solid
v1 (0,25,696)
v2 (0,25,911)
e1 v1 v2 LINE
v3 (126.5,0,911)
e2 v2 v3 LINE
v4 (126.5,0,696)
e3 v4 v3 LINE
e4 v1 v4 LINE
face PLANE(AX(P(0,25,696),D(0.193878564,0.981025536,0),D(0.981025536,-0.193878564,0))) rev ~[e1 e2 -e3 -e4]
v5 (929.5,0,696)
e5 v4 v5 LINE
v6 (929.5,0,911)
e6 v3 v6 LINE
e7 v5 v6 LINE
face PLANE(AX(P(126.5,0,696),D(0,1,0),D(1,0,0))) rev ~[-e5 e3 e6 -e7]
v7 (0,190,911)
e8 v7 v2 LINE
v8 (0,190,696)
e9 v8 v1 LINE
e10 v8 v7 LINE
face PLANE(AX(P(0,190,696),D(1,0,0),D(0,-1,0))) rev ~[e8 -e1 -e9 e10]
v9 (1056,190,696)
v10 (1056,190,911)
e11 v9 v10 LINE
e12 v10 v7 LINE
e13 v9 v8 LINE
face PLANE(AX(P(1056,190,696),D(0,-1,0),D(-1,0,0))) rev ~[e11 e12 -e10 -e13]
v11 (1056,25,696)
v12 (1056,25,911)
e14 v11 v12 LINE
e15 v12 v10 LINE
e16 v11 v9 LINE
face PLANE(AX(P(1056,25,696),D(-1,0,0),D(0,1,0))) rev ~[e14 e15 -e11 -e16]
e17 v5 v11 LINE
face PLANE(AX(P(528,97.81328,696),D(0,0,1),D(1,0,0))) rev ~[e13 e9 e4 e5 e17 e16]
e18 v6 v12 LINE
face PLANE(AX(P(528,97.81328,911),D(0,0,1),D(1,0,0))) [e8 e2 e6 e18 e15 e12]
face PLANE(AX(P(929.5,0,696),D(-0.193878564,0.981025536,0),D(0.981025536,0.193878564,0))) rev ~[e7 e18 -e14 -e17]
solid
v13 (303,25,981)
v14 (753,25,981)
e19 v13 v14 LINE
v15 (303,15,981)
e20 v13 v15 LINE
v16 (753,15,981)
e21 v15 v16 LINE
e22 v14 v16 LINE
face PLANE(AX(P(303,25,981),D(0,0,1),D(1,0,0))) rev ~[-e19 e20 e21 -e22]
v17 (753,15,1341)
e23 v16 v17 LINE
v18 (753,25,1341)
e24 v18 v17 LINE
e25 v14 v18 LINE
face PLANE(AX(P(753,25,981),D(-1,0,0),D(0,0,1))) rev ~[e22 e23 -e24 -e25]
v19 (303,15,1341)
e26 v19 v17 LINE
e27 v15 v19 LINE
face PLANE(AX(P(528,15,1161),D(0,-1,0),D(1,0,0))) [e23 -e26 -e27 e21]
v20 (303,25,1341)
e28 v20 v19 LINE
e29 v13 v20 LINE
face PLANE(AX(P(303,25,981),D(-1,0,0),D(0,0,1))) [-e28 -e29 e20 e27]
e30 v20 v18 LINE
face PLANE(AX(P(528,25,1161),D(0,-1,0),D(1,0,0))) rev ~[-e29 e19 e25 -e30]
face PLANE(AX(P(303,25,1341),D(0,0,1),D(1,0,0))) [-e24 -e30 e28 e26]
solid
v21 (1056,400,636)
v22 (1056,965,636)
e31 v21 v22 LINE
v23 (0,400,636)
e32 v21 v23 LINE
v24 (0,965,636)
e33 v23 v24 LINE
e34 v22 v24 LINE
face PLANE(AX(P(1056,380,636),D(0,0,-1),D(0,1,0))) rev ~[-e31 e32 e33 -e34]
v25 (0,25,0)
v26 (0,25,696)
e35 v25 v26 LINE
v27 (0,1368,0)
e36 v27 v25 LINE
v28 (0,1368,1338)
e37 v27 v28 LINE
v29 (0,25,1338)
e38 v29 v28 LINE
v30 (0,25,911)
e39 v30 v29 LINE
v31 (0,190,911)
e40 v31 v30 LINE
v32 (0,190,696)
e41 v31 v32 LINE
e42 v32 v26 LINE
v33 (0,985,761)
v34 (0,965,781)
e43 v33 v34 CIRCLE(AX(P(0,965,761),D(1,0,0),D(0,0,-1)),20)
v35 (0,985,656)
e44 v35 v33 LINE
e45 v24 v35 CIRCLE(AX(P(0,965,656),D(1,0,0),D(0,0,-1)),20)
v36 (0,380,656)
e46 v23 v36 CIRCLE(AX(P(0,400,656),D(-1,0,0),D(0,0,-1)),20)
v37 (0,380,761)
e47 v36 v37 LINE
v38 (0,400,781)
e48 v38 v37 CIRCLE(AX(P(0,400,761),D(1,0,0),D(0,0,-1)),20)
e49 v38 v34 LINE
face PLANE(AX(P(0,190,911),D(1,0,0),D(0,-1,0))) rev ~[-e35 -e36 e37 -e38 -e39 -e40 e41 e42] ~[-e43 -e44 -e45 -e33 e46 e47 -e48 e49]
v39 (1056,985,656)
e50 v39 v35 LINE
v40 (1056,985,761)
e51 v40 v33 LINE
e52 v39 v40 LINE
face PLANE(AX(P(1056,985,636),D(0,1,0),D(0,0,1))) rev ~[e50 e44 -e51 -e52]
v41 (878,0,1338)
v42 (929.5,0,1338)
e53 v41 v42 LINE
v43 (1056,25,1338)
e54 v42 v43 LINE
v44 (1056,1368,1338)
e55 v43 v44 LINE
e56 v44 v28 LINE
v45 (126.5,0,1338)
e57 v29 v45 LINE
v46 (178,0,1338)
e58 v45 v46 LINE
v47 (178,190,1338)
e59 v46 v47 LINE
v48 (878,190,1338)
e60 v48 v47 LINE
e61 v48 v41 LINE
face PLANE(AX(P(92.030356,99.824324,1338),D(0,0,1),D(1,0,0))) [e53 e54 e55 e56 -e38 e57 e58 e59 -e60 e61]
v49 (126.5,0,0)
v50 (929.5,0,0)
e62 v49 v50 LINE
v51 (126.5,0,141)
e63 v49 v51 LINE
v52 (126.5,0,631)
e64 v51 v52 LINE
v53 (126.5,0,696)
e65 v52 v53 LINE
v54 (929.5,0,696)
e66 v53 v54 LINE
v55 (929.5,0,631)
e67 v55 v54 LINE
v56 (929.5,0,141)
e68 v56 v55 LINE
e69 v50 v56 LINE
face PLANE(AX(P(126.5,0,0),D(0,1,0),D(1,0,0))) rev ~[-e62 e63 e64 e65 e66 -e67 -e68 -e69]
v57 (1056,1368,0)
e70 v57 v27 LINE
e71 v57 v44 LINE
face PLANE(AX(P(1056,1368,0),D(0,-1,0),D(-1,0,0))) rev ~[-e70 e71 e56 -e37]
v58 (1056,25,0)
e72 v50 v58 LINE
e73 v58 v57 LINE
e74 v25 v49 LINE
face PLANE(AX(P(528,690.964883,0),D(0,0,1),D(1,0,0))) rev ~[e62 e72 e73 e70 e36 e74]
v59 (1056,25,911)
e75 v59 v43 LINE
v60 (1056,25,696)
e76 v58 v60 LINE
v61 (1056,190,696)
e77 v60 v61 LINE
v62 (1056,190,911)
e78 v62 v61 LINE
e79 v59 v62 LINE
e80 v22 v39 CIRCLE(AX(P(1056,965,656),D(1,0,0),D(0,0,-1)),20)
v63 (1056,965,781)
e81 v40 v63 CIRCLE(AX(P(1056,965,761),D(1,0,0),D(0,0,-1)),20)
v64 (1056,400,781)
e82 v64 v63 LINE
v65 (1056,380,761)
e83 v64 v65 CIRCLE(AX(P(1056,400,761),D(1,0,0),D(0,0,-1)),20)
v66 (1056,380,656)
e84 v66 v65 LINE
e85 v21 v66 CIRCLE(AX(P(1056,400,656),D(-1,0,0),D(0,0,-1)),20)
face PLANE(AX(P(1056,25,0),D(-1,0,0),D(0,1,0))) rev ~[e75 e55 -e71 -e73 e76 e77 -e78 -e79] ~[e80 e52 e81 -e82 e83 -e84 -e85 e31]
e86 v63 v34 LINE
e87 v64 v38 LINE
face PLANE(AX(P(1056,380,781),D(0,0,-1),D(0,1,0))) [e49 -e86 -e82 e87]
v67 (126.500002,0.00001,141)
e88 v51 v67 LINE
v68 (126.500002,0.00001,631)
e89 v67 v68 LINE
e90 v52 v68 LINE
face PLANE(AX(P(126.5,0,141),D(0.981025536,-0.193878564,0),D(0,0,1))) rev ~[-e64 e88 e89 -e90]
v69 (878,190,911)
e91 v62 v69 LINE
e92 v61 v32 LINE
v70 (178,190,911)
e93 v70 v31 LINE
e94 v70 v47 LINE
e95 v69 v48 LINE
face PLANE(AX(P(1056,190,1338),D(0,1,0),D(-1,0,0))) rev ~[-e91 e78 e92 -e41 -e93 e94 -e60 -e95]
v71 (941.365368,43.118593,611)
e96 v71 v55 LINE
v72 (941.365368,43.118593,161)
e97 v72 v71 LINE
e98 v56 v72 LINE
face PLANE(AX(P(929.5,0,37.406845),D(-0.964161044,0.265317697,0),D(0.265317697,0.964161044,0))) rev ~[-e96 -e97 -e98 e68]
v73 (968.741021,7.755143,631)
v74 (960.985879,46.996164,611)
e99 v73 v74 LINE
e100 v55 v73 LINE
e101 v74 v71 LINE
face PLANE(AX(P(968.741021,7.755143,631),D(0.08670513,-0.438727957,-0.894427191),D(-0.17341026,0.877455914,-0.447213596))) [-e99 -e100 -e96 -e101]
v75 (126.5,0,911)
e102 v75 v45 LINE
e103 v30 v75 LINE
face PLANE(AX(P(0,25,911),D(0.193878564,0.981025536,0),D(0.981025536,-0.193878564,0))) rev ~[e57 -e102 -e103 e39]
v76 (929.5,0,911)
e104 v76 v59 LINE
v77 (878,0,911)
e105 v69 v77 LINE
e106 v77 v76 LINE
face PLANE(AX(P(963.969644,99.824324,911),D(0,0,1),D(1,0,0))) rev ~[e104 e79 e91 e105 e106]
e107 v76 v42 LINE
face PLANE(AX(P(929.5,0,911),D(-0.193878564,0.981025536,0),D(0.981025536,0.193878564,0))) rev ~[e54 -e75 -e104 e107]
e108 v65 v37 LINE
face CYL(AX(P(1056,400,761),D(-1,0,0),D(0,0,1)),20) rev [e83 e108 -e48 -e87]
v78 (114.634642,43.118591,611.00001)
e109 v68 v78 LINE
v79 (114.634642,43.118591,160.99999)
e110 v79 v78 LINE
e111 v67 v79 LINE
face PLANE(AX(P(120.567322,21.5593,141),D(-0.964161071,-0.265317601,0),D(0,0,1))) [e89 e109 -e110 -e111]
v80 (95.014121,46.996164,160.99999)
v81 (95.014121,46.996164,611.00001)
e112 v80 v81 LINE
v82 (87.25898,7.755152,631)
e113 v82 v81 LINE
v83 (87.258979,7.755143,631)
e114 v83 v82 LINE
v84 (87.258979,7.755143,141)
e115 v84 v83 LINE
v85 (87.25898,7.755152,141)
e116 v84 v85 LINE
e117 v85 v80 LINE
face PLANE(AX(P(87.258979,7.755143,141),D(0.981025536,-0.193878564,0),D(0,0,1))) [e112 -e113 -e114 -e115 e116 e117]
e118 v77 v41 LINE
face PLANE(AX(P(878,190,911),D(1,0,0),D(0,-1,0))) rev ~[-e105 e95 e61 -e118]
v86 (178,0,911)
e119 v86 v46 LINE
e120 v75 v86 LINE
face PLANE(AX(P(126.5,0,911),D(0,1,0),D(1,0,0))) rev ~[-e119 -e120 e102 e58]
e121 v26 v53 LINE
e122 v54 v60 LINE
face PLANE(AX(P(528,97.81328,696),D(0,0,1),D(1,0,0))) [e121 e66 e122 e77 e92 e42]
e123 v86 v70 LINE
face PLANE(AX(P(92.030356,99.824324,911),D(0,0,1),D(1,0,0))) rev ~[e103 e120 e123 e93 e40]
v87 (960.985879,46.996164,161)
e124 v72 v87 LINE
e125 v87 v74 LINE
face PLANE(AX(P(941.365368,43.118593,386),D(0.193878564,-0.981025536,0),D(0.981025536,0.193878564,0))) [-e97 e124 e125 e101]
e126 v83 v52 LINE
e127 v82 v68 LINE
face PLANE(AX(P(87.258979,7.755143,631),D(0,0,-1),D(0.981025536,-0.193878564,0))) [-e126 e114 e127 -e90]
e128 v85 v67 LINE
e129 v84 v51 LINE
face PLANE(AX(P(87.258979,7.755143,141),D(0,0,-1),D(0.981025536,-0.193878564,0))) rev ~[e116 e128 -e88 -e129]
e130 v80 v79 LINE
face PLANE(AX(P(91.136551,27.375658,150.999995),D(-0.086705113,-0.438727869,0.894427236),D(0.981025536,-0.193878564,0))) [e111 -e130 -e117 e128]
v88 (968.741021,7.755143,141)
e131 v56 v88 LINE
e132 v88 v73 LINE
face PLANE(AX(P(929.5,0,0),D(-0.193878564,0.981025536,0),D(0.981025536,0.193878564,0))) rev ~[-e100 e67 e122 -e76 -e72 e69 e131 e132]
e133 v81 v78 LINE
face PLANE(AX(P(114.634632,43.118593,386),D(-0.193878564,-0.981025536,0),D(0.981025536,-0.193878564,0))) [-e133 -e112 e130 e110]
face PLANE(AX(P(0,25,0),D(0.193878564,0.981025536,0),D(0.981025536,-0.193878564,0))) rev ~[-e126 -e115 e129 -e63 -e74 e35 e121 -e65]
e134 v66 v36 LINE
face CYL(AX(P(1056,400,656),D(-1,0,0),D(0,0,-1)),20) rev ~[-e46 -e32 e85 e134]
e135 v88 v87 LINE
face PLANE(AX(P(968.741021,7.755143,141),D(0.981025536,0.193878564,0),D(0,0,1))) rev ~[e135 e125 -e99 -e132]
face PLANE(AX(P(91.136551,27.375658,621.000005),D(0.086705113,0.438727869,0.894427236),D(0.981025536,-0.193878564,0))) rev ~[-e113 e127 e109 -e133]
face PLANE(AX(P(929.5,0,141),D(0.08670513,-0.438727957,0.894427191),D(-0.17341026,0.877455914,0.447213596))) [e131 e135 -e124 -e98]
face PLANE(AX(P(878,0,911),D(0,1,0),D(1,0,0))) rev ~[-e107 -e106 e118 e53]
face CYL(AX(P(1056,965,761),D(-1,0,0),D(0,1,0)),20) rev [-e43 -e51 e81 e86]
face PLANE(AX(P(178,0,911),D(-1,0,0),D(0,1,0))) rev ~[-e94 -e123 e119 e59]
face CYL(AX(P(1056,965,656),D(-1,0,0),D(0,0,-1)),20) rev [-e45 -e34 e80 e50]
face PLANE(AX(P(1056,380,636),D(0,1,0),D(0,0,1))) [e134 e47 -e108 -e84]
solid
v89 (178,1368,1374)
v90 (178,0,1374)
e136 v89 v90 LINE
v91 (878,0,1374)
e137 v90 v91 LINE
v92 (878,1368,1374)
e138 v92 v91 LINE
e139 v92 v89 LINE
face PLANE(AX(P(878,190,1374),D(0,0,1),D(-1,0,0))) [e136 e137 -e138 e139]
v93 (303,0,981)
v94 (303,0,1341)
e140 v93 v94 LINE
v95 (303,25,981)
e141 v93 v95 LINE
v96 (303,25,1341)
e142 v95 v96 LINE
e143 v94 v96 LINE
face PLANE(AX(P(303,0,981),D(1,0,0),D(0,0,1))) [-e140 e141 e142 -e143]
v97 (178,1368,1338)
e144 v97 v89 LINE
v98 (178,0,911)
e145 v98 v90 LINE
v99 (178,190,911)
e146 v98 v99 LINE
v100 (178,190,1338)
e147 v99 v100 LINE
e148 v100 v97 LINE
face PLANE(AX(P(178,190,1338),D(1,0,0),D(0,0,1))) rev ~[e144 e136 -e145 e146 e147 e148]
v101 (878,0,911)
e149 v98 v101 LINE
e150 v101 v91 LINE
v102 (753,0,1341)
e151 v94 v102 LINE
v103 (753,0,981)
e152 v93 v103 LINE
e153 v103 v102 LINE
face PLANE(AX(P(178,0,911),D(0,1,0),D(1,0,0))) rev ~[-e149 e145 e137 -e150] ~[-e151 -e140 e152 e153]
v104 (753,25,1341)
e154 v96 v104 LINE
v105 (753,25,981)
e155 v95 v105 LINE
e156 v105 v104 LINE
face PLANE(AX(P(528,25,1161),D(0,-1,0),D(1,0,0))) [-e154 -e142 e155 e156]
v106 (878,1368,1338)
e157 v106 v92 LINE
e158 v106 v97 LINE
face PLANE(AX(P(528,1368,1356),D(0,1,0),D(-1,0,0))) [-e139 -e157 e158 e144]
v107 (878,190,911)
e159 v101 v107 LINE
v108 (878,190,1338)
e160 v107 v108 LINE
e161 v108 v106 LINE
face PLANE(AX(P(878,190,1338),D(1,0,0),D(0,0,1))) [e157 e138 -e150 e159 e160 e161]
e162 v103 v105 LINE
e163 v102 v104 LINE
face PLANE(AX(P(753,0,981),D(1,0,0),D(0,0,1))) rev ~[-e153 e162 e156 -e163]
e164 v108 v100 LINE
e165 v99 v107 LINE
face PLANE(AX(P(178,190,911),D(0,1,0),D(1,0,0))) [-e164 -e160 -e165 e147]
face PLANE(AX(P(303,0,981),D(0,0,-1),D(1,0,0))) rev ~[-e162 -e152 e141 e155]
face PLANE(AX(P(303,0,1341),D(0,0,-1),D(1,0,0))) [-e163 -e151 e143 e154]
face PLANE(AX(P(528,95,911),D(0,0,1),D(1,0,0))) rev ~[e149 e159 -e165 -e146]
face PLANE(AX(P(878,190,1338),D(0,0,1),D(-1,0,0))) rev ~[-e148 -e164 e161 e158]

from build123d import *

# Parameters (mm, degrees)
F1_DEPTH     = 1338
F3_DEPTH     = 642
F4_DEPTH     = 215
F5_W         = 700
F5_H         = 190
F6_DEPTH     = 463
F8_DEPTH     = 427
F9_W         = 700
F9_H         = 36
F10_DEPTH    = 1178
F11_W        = 605
F11_H        = 145
F12_DEPTH    = 1056.001
F13_R        = 20
F14_W        = 450
F14_H        = 360
F15_DEPTH    = 25
F16_DEPTH    = 10
F17_W        = 40
F17_H        = 490
F18_DEPTH    = 40
F19_SIZE2    = 19.99999
F19_SIZE     = 39.99999
F20_W        = 40
F20_H        = 490
F21_DEPTH    = 40
F22_T1_DEPTH = 593.5931549515
F22_T3_DEPTH = 40
F22_T5_DEPTH = 40


# Not quite as in the source:
# - a fillet or chamfer that OpenCascade refuses, or shapes differently, is made with other operations: its cross-section is extruded or revolved along the edge and cut away or added
# - a fillet or chamfer is up to 0.001 mm smaller than in the source, because OpenCascade refuses the exact size


with BuildPart() as f1:
    # F0 (on Top) → F1 (new body)
    with BuildSketch(Plane.XY):
        Polygon((1056, 1368), (0, 1368), (0, 25), (126.5, 0), (929.5, 0), (1056, 25), align=None)
    extrude(amount=F1_DEPTH)

    # F2 (on face) → F3 (cut)
    with BuildSketch(Plane.XY.offset(1338)):
        Polygon((1056, 190), (0, 190), (0, 25), (126.5, 0), (929.5, 0), (1056, 25), align=None)
    extrude(amount=-F3_DEPTH, mode=Mode.SUBTRACT)


with BuildPart() as f4:
    # F4 (new): a face of the model
    f4_faces = [f1.part.faces().sort_by_distance(p)[0] for p in [
        (528, 96.3879218308, 696),
    ]]
    extrude(f4_faces, amount=F4_DEPTH)


with BuildPart() as f6:
    # F5 (on face) → F6 (new body)
    with BuildSketch(Plane.XY.offset(911)):
        with Locations((528, 95)):
            Rectangle(F5_W, F5_H)
    extrude(amount=F6_DEPTH)

    # F9 (on face) → F10 (join, through all)
    with BuildSketch(Plane(origin=(0, 190, 0), x_dir=(-1, 0, 0), z_dir=(0, 1, 0))):
        with Locations((-528, 1356)):
            Rectangle(F9_W, F9_H)
    extrude(amount=F10_DEPTH)

    # F14 (on face) → F15 (cut)
    with BuildSketch(Plane.XZ):
        with Locations((528, 1161)):
            Rectangle(F14_W, F14_H)
    extrude(amount=-F15_DEPTH, mode=Mode.SUBTRACT)


with BuildPart() as f1_1:
    add(f1.part)

    # F7 (on face) → F8 (join, through all)
    with BuildSketch(Plane.XY.offset(911)):
        Polygon((0, 25), (126.5, 0), (178, 0), (178, 190), (0, 190), align=None)
        Polygon((878, 190), (878, 0), (929.5, 0), (1056, 25), (1056, 190), align=None)
    extrude(amount=F8_DEPTH)

    # F11 (on face) → F12 (cut, through all)
    with BuildSketch(Plane.YZ.offset(1056)):
        with Locations((682.5, 708.5)):
            Rectangle(F11_W, F11_H)
    extrude(amount=-F12_DEPTH, mode=Mode.SUBTRACT)

    # F13
    f13_edges = [f1_1.edges().sort_by_distance(p)[0] for p in [
        (528, 380, 781),
        (528, 985, 781),
        (528, 380, 636),
        (528, 985, 636),
    ]]
    fillet(f13_edges, radius=F13_R)

    # F17 (on face) → F18 (cut)
    with BuildSketch(Plane(origin=(4.7549955645, 24.0602775564, 0), x_dir=(0.981025536, -0.1938785644, 0), z_dir=(-0.1938785644, -0.981025536, 0))):
        with Locations((104.0997303022, 386)):
            Rectangle(F17_W, F17_H)
    extrude(amount=-F18_DEPTH, mode=Mode.SUBTRACT)

    # F19 (size 40 and 20 in the source; OpenCascade refuses exactly that, so slightly less here)
    f19_edges = [f1_1.edges().sort_by_distance(p)[0] for p in [
        (134.255143, 39.241021, 386),
        (114.634632, 43.118593, 631),
        (114.634632, 43.118593, 141),
    ]]
    chamfer(f19_edges, length=F19_SIZE, length2=F19_SIZE2)

    # F20 (on face) → F21 (cut)
    with BuildSketch(Plane(origin=(34.9388804523, -176.7907350885, 0), x_dir=(0.981025536, 0.1938785644, 0), z_dir=(0.1938785644, -0.981025536, 0))):
        with Locations((931.8632356991, 386)):
            Rectangle(F20_W, F20_H)
    extrude(amount=-F21_DEPTH, mode=Mode.SUBTRACT)

    # F22: chamfer of 20 x 40 on 3 edges, made by hand

    # F22_s2 → F22_t1 (join)
    with BuildSketch(Plane.XY.offset(37.4068450485)):
        Polygon((929.5, 0), (941.3653681428, 43.1185927279), (921.744857423, 39.2410214394), align=None)
    extrude(amount=F22_T1_DEPTH)

    # F22_s4 → F22_t3 (join)
    with BuildSketch(Plane(origin=(933.8021409872, 184.5458776655, 0), x_dir=(0, 0, 1), z_dir=(-0.981025536, -0.1938785644, 0))):
        Polygon((631, -180.2101256322), (611, -140.2101256322), (631, -140.2101256322), align=None)
    extrude(amount=F22_T3_DEPTH)

    # F22_s6 → F22_t5 (join)
    with BuildSketch(Plane(origin=(894.5611195477, 176.7907350885, 0), x_dir=(0, 0, 1), z_dir=(0.981025536, 0.1938785644, 0))):
        Polygon((141, 180.2101256322), (161, 140.2101256322), (141, 140.2101256322), align=None)
    extrude(amount=F22_T5_DEPTH)


with BuildPart() as f16:
    # F16 (new): a face of the model
    f16_faces = [f6.part.faces().sort_by_distance(p)[0] for p in [
        (528, 25, 1161),
    ]]
    extrude(f16_faces, amount=F16_DEPTH)


solid = Compound([f4.part, f6.part, f1_1.part, f16.part])
